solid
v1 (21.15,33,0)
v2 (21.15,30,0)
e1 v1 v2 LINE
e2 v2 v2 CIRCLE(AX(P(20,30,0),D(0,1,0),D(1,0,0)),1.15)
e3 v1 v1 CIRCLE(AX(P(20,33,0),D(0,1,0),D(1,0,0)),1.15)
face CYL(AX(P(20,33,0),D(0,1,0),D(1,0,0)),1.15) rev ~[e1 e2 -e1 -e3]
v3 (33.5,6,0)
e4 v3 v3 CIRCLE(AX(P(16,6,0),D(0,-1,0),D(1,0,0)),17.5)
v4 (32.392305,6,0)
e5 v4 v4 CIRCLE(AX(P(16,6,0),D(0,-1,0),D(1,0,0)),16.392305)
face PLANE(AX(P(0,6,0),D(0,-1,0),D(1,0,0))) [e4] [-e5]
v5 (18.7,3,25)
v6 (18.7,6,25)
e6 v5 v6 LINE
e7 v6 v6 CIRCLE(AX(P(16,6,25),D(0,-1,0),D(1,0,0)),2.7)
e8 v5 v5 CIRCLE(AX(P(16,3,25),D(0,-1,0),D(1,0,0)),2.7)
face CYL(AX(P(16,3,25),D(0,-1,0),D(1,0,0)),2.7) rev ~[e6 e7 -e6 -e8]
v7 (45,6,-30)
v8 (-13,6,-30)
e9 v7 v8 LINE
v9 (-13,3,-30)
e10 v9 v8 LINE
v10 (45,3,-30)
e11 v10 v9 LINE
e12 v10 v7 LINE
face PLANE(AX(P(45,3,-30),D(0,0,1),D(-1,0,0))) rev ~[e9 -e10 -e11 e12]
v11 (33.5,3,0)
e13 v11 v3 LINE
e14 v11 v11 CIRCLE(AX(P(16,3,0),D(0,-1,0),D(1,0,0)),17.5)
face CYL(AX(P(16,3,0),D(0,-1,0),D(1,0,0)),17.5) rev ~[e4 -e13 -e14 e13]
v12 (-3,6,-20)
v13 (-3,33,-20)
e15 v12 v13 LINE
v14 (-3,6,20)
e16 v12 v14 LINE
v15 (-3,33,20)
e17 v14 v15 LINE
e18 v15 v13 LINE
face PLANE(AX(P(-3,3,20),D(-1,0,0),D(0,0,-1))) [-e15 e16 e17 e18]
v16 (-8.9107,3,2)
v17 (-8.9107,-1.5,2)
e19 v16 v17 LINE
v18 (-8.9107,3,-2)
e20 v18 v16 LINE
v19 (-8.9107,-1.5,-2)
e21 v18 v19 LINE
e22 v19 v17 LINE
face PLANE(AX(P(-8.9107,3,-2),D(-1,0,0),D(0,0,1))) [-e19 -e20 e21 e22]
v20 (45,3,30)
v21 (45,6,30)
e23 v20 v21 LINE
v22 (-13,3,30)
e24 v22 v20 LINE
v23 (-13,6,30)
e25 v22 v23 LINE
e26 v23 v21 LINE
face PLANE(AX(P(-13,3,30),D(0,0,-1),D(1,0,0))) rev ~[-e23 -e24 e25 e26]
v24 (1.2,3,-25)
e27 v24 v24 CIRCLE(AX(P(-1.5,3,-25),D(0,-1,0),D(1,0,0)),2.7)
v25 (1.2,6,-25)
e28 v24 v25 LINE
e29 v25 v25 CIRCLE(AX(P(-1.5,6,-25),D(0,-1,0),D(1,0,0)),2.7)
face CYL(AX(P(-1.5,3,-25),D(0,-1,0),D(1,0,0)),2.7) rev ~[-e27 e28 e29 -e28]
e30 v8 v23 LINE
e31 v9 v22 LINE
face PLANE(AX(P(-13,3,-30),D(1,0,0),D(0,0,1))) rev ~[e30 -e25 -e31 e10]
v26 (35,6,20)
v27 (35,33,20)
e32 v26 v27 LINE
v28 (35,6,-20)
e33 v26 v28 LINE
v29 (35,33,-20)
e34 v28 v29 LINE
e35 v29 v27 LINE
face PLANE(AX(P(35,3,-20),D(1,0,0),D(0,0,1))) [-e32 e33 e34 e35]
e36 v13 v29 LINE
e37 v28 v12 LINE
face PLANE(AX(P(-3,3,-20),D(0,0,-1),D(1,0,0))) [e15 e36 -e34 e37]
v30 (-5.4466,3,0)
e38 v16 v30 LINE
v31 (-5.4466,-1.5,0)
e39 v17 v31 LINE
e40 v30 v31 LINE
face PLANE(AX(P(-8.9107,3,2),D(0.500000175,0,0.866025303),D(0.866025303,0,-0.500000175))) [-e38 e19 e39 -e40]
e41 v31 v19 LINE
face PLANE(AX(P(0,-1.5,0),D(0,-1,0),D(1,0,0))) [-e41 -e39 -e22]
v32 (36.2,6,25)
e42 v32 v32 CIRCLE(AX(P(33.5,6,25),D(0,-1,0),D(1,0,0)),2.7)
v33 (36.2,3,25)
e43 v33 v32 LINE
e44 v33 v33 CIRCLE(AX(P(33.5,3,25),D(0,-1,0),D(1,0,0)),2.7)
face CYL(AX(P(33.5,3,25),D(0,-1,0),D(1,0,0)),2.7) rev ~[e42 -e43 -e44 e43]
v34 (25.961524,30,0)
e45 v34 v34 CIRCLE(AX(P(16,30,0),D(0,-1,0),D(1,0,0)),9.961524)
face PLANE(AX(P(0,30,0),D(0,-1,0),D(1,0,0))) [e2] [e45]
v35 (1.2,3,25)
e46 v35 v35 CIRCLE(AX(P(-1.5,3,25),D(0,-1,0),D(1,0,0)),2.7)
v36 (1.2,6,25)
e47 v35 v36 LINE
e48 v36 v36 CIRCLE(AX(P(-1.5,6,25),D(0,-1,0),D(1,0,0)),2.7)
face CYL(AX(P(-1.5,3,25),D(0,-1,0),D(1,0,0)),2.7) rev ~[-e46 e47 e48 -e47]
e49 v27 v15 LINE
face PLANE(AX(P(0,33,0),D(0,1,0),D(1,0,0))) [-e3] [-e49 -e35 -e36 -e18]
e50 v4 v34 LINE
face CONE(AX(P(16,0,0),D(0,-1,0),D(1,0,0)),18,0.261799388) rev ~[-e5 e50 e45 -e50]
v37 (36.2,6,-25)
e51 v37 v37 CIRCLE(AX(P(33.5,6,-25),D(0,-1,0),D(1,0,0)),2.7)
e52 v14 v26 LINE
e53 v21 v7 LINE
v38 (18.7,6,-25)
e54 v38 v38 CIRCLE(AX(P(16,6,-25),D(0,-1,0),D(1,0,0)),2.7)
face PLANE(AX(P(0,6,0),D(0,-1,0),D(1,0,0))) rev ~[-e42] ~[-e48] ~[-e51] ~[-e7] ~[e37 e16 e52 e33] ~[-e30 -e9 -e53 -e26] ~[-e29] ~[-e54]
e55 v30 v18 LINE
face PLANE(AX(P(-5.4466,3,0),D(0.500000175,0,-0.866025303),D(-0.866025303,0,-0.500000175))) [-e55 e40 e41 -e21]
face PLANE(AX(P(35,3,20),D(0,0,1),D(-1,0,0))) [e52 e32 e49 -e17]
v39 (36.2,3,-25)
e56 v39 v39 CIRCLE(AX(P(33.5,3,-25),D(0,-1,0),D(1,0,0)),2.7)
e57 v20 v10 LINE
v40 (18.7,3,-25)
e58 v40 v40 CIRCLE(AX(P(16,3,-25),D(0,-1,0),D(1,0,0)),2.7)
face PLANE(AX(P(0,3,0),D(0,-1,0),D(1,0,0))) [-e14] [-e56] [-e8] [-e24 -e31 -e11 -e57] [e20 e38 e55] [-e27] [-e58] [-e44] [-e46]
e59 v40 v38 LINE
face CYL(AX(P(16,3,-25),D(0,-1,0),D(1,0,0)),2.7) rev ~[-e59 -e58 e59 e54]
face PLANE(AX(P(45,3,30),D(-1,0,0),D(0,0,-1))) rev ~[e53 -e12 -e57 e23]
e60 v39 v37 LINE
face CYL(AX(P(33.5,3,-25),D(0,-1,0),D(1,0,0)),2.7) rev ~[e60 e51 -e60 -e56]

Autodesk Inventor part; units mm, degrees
ref_plane "YZ Plane" through (0, 0, 0) normal (1, 0, 0) x (0, 1, 0)
ref_plane "XZ Plane" through (0, 0, 0) normal (0, 1, 0) x (-1, 0, 0)
ref_plane "XY Plane" through (0, 0, 0) normal (0, 0, 1) x (1, 0, 0)
ref_plane "Work Plane5" through (0, 3, 0) normal (0, 1, 0) x (1, 0, 0)
sketch "Sketch45" plane through (0, 3, 0) normal (0, 1, 0) x (1, 0, 0)
  line L0 (35, -20) -> (-3, -20)
  line L1 (-3, -20) -> (-3, 20)
  line L2 (-3, 20) -> (35, 20)
  line L3 (35, 20) -> (35, -20)
  point P0 (0, 0)
  dimension "d142" = 38
  dimension "d143" = 40
extrude "Extrusion34" add sketch "Sketch45" along normal blind 30
ref_plane "Work Plane2" through (0, 0, 0) normal (0, -1, 0) x (1, 0, 0)
sketch "Sketch47" plane through (0, 0, 0) normal (0, -1, 0) x (1, 0, 0)
  circle A0 centre (16, 0) radius 18
  point P0 (0, 0)
  dimension "d146" = 36
extrude "Extrusion35" cut sketch "Sketch47" against normal blind 30 draft -15
ref_plane "Work Plane1" through (0, 3, 0) normal (0, 1, 0) x (1, 0, 0)
sketch "Sketch74" plane through (0, 33, 0) normal (0, 1, 0) x (1, 0, 0)
  circle A0 centre (20, 0) radius 1.15
  point P0 (0, 0)
  dimension "d210" = 2.3
extrude "Extrusion51" cut sketch "Sketch74" against normal blind 10
sketch "Sketch77" plane through (0, 3, 0) normal (0, -1, 0) x (1, 0, 0)
  circle A0 centre (16, 0) radius 17.5
  point P0 (0, 0)
  dimension "d219" = 35
sketch "Sketch78" plane through (0, 3, 0) normal (0, -1, 0) x (1, 0, 0)
  line L0 (45, -30) -> (-13, -30)
  line L1 (-13, -30) -> (-13, 30)
  line L2 (-13, 30) -> (45, 30)
  line L3 (45, 30) -> (45, -30)
  line L4 (45, -30) -> (-13, 30) construction
  line L5 (-13, -30) -> (45, 30) construction
  point P0 (0, 0)
  point P1 (16, 0)
  dimension "d220" = 58
  dimension "d221" = 60
extrude "Extrusion53" add sketch "Sketch78" against normal blind 3
extrude "Extrusion54" cut sketch "Sketch77" against normal blind 3
sketch "Sketch81" plane through (0, 3, 0) normal (0, -1, 0) x (1, 0, 0)
  circle A0 centre (33.5, -25) radius 2.7
  line L0 (-13, -30) -> (45, -30) projected
  line L1 (45, -30) -> (45, 30) projected
  circle A1 centre (16, -25) radius 2.7
  circle A2 centre (-1.5, -25) radius 2.7
  circle A3 centre (-1.5, 25) radius 2.7
  circle A4 centre (16, 25) radius 2.7
  circle A5 centre (33.5, 25) radius 2.7
  point P0 (0, 0)
  dimension "mag_D" = 5.4
  dimension "d232" = 5
  dimension "d233" = 11.5
  dimension "d234" = 5.4
  dimension "d235" = 17.5
  dimension "d236" = 5.4
  dimension "d237" = 17.5
  dimension "d243" = 5.4
  dimension "d245" = 5.4
  dimension "d246" = 17.5
  dimension "d247" = 5.4
  dimension "d248" = 17.5
extrude "Extrusion56" cut sketch "Sketch81" against normal blind 30
sketch "Sketch83" plane through (0, 3, 0) normal (0, -1, 0) x (1, 0, 0)
  line L0 (-8.9107, -2) -> (-8.9107, 2)
  line L1 (-8.9107, 2) -> (-5.4466, 0)
  line L2 (-5.4466, 0) -> (-8.9107, -2)
  point P0 (0, 0)
  point P1 (-8.9107, -9.2159)
  point P2 (-7.756, 0)
  dimension "d253" = 4
extrude "Extrusion57" add sketch "Sketch83" along normal blind 4.5
equation "\"d234\" = mag_D"
equation "\"d236\" = mag_D"
equation "\"d237\" = d235"
equation "\"d243\" = mag_D"
equation "\"d245\" = mag_D"
equation "\"d246\" = d235"
equation "\"d247\" = mag_D"
equation "\"d248\" = d235"
properties part number "liquid_port_v05"
